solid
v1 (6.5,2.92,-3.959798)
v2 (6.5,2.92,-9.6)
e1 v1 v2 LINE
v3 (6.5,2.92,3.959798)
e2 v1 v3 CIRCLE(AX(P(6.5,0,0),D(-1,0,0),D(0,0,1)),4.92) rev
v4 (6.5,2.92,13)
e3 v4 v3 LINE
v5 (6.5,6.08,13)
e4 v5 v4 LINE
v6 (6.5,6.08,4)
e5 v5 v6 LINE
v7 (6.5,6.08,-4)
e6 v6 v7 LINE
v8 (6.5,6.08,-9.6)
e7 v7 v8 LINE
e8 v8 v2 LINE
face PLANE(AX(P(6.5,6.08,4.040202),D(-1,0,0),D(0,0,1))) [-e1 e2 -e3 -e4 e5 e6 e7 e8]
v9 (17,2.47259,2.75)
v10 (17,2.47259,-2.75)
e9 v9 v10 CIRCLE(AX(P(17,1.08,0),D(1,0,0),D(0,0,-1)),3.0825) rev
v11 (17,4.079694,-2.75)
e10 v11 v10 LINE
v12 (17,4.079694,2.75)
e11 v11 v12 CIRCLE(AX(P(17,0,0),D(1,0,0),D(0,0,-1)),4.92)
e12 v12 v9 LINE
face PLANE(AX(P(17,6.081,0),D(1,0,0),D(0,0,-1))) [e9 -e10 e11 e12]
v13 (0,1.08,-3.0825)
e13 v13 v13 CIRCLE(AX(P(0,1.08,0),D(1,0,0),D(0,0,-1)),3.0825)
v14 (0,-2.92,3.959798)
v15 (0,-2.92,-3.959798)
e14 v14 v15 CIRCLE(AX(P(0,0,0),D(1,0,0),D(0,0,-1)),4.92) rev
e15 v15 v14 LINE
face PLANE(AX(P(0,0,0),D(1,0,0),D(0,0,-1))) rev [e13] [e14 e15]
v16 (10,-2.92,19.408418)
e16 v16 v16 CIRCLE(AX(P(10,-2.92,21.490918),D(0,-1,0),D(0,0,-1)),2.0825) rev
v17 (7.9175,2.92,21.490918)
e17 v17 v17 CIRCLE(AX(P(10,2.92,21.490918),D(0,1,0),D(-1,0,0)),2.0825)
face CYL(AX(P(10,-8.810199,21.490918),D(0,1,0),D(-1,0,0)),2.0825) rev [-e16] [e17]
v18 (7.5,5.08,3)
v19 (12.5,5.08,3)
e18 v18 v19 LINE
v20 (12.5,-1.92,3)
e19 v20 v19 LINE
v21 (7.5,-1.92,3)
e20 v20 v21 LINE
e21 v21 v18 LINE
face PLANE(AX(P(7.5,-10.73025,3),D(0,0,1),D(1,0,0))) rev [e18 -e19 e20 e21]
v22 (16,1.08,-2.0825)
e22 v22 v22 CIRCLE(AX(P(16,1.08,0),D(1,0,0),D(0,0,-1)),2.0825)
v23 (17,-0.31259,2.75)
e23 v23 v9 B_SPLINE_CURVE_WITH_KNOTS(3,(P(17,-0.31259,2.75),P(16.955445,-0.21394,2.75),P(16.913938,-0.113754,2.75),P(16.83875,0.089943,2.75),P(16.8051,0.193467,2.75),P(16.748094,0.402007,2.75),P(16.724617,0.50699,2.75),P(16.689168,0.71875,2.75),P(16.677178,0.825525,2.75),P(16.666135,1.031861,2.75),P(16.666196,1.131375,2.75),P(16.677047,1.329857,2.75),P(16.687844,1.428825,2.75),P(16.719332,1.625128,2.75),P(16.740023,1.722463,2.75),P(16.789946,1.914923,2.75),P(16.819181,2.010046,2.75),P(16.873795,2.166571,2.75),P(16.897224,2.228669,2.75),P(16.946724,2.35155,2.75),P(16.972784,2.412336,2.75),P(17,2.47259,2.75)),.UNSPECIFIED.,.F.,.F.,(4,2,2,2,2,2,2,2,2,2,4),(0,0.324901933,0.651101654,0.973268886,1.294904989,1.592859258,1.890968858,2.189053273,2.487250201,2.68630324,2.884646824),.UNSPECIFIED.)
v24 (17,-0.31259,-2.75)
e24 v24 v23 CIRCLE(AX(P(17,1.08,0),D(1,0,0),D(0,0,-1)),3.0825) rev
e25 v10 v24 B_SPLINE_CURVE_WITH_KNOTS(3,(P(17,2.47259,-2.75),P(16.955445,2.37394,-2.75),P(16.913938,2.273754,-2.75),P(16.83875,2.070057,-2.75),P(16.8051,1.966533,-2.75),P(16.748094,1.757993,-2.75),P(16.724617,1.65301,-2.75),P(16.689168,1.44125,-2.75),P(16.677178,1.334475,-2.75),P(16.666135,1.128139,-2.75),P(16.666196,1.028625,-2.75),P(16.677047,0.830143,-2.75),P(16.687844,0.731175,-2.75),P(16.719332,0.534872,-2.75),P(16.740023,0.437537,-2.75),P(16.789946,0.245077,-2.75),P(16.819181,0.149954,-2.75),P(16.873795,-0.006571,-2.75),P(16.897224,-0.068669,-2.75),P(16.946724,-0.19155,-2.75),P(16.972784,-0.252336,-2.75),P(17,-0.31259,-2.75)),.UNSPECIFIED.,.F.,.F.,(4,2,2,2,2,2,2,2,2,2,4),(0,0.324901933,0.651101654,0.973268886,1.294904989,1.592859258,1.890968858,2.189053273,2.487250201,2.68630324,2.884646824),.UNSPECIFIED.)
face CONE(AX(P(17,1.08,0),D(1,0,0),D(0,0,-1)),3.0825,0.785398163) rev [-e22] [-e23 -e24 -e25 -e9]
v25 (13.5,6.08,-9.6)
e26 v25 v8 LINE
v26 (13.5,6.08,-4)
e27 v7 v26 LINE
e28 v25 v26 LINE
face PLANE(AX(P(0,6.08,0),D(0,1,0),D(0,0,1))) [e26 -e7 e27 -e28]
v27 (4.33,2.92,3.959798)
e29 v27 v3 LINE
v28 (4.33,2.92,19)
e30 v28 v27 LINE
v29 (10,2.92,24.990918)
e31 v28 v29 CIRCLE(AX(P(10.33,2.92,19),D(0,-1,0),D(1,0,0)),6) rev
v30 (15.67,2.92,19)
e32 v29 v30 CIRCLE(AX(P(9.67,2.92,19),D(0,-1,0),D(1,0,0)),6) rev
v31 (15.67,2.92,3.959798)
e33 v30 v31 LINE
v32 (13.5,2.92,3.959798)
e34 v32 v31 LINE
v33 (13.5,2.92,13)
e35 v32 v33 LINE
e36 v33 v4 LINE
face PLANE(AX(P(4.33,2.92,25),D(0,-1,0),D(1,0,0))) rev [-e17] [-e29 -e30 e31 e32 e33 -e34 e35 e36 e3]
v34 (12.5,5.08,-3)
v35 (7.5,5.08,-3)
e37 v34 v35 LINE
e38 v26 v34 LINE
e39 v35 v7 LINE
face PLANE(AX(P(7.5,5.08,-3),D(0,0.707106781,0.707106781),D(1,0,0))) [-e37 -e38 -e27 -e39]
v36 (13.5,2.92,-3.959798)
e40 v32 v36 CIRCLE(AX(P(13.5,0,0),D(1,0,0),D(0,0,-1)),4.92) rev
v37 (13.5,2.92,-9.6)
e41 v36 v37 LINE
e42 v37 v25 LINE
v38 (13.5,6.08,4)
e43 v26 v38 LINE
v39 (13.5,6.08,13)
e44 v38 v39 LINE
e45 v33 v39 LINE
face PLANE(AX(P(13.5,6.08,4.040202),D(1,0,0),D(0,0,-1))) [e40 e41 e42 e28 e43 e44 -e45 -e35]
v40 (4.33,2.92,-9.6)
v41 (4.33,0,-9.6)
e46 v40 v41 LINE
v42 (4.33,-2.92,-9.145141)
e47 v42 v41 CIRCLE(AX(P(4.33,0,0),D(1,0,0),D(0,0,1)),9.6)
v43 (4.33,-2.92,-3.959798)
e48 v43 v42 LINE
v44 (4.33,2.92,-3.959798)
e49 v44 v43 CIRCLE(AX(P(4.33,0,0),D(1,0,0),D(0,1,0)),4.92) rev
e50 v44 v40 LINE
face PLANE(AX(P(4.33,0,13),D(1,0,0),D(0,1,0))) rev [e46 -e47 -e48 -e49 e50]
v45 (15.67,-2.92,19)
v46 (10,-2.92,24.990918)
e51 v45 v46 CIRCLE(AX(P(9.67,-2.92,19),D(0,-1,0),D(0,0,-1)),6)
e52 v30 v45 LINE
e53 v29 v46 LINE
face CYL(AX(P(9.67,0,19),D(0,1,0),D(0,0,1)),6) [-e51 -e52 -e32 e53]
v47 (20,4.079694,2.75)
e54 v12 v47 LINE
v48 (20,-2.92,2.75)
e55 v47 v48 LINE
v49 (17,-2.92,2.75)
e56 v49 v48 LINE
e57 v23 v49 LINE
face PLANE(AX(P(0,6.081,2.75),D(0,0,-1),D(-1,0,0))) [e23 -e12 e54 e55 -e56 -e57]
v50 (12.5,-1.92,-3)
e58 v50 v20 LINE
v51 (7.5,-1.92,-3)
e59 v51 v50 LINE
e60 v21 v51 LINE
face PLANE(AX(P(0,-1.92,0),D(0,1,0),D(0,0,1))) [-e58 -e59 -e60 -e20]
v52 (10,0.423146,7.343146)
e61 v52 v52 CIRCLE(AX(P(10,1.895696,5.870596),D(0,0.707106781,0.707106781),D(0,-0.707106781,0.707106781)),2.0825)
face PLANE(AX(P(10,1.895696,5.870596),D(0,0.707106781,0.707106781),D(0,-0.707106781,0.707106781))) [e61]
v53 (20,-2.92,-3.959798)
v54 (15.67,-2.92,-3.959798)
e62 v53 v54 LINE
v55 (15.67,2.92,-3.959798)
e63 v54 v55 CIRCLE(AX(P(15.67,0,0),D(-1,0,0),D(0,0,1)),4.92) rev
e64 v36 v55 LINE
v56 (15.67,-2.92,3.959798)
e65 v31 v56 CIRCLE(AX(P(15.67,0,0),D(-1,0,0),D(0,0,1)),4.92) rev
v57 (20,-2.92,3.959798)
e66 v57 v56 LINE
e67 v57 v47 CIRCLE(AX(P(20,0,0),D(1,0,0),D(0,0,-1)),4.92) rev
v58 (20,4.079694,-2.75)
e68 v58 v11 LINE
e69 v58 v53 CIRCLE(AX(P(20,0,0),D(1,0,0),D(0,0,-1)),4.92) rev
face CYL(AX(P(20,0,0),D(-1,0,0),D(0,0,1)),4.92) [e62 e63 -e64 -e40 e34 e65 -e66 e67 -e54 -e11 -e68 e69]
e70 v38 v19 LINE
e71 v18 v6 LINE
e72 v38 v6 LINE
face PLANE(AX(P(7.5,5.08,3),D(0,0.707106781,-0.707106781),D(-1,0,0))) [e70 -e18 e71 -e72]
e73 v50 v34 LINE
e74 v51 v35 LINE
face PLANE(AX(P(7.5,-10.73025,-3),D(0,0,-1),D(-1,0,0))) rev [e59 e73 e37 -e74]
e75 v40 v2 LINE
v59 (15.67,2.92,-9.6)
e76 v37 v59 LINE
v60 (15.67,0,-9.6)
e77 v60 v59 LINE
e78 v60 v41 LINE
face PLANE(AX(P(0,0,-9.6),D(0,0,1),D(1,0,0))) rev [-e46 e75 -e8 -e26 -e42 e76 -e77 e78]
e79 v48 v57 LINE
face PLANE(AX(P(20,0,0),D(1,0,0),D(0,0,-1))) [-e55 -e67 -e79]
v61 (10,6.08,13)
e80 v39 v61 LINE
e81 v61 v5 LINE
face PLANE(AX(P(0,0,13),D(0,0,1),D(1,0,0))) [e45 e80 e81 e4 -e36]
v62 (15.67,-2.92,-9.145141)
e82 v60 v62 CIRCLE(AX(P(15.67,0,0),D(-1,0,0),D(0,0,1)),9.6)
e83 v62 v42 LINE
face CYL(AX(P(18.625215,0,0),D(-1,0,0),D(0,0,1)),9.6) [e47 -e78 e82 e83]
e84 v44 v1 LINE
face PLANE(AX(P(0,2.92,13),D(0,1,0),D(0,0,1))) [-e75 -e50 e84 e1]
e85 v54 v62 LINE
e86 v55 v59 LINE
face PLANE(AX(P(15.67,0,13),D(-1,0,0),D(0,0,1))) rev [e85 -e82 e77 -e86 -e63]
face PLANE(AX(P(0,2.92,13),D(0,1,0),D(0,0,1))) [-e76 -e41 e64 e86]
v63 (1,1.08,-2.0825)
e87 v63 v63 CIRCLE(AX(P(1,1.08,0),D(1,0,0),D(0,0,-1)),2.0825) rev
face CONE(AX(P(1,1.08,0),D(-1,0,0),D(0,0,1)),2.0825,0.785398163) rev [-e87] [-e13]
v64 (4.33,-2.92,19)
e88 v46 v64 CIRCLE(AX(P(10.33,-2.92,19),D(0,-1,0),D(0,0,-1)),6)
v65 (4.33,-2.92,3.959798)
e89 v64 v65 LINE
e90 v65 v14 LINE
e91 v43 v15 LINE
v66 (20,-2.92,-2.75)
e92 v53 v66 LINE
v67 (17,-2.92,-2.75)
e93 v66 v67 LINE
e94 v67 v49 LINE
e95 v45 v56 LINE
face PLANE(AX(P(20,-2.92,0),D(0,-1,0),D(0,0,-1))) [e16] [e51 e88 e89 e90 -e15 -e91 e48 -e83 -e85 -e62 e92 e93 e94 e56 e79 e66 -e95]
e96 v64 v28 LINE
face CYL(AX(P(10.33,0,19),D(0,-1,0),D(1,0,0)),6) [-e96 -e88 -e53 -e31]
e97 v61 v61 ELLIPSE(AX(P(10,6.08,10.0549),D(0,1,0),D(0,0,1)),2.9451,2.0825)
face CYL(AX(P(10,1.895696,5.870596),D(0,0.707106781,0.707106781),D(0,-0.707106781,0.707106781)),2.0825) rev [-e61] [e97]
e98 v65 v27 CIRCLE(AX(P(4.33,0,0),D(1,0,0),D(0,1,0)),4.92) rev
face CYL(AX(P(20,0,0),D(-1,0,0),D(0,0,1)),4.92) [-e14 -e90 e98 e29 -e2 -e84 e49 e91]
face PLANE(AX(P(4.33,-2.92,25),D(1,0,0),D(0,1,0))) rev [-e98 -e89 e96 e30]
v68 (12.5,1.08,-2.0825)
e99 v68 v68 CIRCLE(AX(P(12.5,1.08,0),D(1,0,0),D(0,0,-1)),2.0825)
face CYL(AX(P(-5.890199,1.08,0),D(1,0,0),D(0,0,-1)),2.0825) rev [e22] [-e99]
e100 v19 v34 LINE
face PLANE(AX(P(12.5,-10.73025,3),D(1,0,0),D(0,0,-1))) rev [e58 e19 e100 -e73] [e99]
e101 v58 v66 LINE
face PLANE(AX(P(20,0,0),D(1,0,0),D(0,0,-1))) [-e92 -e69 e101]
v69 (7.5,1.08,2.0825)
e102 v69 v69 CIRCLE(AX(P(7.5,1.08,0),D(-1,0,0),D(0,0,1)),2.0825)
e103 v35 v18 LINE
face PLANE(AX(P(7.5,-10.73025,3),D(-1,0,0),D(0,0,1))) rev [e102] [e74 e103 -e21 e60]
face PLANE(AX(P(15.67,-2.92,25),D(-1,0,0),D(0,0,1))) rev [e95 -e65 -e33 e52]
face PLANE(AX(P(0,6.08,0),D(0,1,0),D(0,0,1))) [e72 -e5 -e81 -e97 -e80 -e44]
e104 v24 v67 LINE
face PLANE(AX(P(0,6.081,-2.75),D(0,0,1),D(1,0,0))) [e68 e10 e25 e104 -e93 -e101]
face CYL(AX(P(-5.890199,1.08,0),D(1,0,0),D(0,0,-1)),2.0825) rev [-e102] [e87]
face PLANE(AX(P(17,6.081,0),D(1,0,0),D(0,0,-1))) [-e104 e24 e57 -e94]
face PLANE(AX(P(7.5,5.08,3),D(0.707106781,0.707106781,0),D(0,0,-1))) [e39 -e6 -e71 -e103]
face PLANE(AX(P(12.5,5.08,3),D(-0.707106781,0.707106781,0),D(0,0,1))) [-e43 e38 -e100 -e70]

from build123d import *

# Parameters (mm, degrees)
BOSS_EXTRUDE1_DEPTH      = 20
SKETCH3_W                = 11.34
SKETCH3_H                = 5.84
BOSS_EXTRUDE2_DEPTH      = 25
FILLET1_R                = 6
SKETCH4_W                = 7
SKETCH4_H                = 8
BOSS_EXTRUDE3_DEPTH      = 9
BOSS_EXTRUDE4_DEPTH      = 13
BOSS_EXTRUDE4_DEPTH_BACK = 9.6
SKETCH10_W               = 7
SKETCH10_H               = 3.16
SKETCH5_W                = 5
SKETCH5_H                = 6
CUT_EXTRUDE1_DEPTH       = 9
SKETCH6_R                = 2.0825
CUT_EXTRUDE2_DEPTH       = 5.84
CUT_EXTRUDE3_REACH       = 34.581
SKETCH8_R                = 2.0825
CUT_EXTRUDE4_REACH       = 35.25
CUT_EXTRUDE4_END_RADIUS  = 4.92
CUT_EXTRUDE5_DEPTH       = 11.34
SKETCH13_R               = 2.0825
CUT_EXTRUDE7_DEPTH       = 8
SKETCH14_W               = 5
SKETCH14_H               = 6
BOSS_EXTRUDE5_DEPTH      = 1


with BuildPart() as part:
    # Sketch2 → Boss-Extrude1 (new body)
    with BuildSketch(Plane(origin=(0, 0, 0), x_dir=(0, 0, -1), z_dir=(1, 0, 0))):
        with BuildLine():
            Line((3.959797975, -2.92), (-3.959797975, -2.92))
            ThreePointArc((-3.959797975, -2.92), (-4.92, 0), (-3.959797975, 2.92))
            ThreePointArc((-3.959797975, 2.92), (0, 4.92), (3.959797975, 2.92))
            ThreePointArc((3.959797975, 2.92), (4.92, 0), (3.959797975, -2.92))
        make_face()
    extrude(amount=BOSS_EXTRUDE1_DEPTH)

    # Sketch3 → Boss-Extrude2 (add)
    with BuildSketch(Plane.XY):
        with Locations((10, 0)):
            Rectangle(SKETCH3_W, SKETCH3_H)
    extrude(amount=BOSS_EXTRUDE2_DEPTH)

    # Fillet1
    # the kernel refuses this fillet: 6 mm, written as the material it takes off along each edge
    with BuildSketch(Plane(origin=(15.67, -17.92, 25), x_dir=(0, 0, -1), z_dir=(0, 1, 0)), Plane(origin=(4.33, 17.92, 25), x_dir=(0, 0, -1), z_dir=(0, -1, 0))) as fillet1_piece_1:
        with BuildLine():
            CenterArc((FILLET1_R, FILLET1_R), FILLET1_R, 180, 90)
            Line((0, FILLET1_R), (0, 0))
            Line((0, 0), (FILLET1_R, 0))
        make_face()
    extrude(amount=35.84, mode=Mode.SUBTRACT)

    # Sketch4 → Boss-Extrude3 (add)
    with BuildSketch(Plane.XZ.offset(2.92)):
        with Locations((10, 0.040202025)):
            Rectangle(SKETCH4_W, SKETCH4_H)
    extrude(amount=-BOSS_EXTRUDE3_DEPTH)

    # Sketch10 → Boss-Extrude4 (add, two sides: drawn at the far end of the back side and taken through both)
    with BuildSketch(Plane.XY.offset(-BOSS_EXTRUDE4_DEPTH_BACK)):
        with Locations((10, 4.5)):
            Rectangle(SKETCH10_W, SKETCH10_H)
        Polygon((6.5, 2.92), (13.5, 2.92), (15.67, 2.92), (15.67, -2.92), (10, -2.92), (4.33, -2.92), (4.33, 2.92), align=None)
    extrude(amount=BOSS_EXTRUDE4_DEPTH + BOSS_EXTRUDE4_DEPTH_BACK)

    # Sketch5 → Cut-Extrude1 (cut)
    with BuildSketch(Plane(origin=(0, 6.08, 0), x_dir=(1, 0, 0), z_dir=(0, 1, 0))):
        with Locations((10, 0)):
            Rectangle(SKETCH5_W, SKETCH5_H)
    extrude(amount=-CUT_EXTRUDE1_DEPTH, mode=Mode.SUBTRACT)

    # Sketch6 → Cut-Extrude2 (cut)
    with BuildSketch(Plane(origin=(0, 2.92, 0), x_dir=(1, 0, 0), z_dir=(0, 1, 0))):
        with Locations(Location((10, -21.490918127, 0), (0, 0, 180))):
            Circle(SKETCH6_R)
    extrude(amount=-CUT_EXTRUDE2_DEPTH, mode=Mode.SUBTRACT)

    # Cut-Extrude3: up to this face of the body (flat: up to its plane)
    cut_extrude3_end = Plane(part.part.faces().sort_by_distance((0, 0.637144392, 0))[0])
    # Sketch8 → Cut-Extrude3 (cut, up to the picked face)
    with BuildSketch(Plane(origin=(20, 0, 0), x_dir=(0, 0, -1), z_dir=(1, 0, 0)), mode=Mode.PRIVATE) as cut_extrude3_sk1:
        with Locations((0, 1.08)):
            Circle(SKETCH8_R)
    cut_extrude3_tool1 = split(extrude(cut_extrude3_sk1.sketch, amount=-CUT_EXTRUDE3_REACH, mode=Mode.PRIVATE), bisect_by=cut_extrude3_end, keep=Keep.BOTH, mode=Mode.PRIVATE)
    add(cut_extrude3_tool1.solids().sort_by(Axis((20, 1.08, 0), (-1, 0, 0)))[0], mode=Mode.SUBTRACT)

    # Cut-Extrude4: up to this cylinder (the profile starts inside it)
    cut_extrude4_end = Plane(origin=(18.5, 0, 0), z_dir=(-1, 0, 0)) * Cylinder(CUT_EXTRUDE4_END_RADIUS, 81.34, mode=Mode.PRIVATE)
    # Sketch9 → Cut-Extrude4 (cut, up to the surface)
    with BuildSketch(Plane(origin=(0, -2.92, 0), x_dir=(1, 0, 0), z_dir=(0, 1, 0)), mode=Mode.PRIVATE) as cut_extrude4_sk1:
        Polygon((17, -2.75), (20, -2.75), (20, -2.0825), (20, 2.0825), (20, 2.75), (17, 2.75), align=None)
    cut_extrude4_tool1 = extrude(cut_extrude4_sk1.sketch, amount=CUT_EXTRUDE4_REACH, mode=Mode.PRIVATE) & cut_extrude4_end
    add(cut_extrude4_tool1.solids().sort_by_distance((18.5, -2.92, 0))[0], mode=Mode.SUBTRACT)

    # Chamfer1
    # the kernel refuses this chamfer: 1 mm, written as the material it takes off along each edge
    with BuildSketch(Plane(origin=(12.5, 6.08, 3), x_dir=(-0.027495876610585623, -0.9996219169112968, 0), z_dir=(0, 0, -1)), Plane(origin=(7.5, 6.08, -3), x_dir=(0.027495876610586487, -0.9996219169112968, 0), z_dir=(0, 0, 1))) as chamfer1_piece_1:
        with BuildLine():
            Line((1.028673195, 0), (-0.056547155, -1.027117794))
            Line((-0.056547155, -1.027117794), (-0.076539593, -1.026567876))
            ThreePointArc((-0.076539593, -1.026567876), (-0.034129227, -0.51339783), (-0.019992438, 0.000549918))
            Line((-0.019992438, 0.000549918), (0.000549918, 0.019992438))
            ThreePointArc((0.000549918, 0.019992438), (0.514497665, 0.00585565), (1.029223113, 0.019992438))
            Line((1.029223113, 0.019992438), (1.028673195, 0))
        make_face()
    extrude(amount=6, mode=Mode.SUBTRACT)
    with BuildSketch(Plane(origin=(12.5, 6.08, -3), x_dir=(0, -0.9996219169112968, 0.027495876610586487), z_dir=(-1, 0, 0)), Plane(origin=(7.5, 6.08, 3), x_dir=(0, -0.9996219169112968, -0.027495876610586487), z_dir=(1, 0, 0))) as chamfer1_piece_2:
        with BuildLine():
            Line((1.028673195, 0), (-0.056547155, -1.027117794))
            Line((-0.056547155, -1.027117794), (-0.076539593, -1.026567876))
            ThreePointArc((-0.076539593, -1.026567876), (-0.034129227, -0.51339783), (-0.019992438, 0.000549918))
            Line((-0.019992438, 0.000549918), (0.000549918, 0.019992438))
            ThreePointArc((0.000549918, 0.019992438), (0.514497665, 0.00585565), (1.029223113, 0.019992438))
            Line((1.029223113, 0.019992438), (1.028673195, 0))
        make_face()
    extrude(amount=5, mode=Mode.SUBTRACT)
    with BuildSketch(Plane(origin=(0, 1.08, 0), x_dir=(0, 0, -1), z_dir=(0, -1, 0))) as chamfer1_piece_3:
        with BuildLine():
            Line((3.110784271, -0.028284271), (2.054215729, 1.028284271))
            Line((2.054215729, 1.028284271), (2.034215729, 1.028284271))
            ThreePointArc((2.034215729, 1.028284271), (2.0625, 0.514142136), (2.0625, 0))
            Line((2.0625, 0), (2.0825, -0.02))
            ThreePointArc((2.0825, -0.02), (2.596642136, -0.02), (3.110784271, -0.048284271))
            Line((3.110784271, -0.048284271), (3.110784271, -0.028284271))
        make_face()
    revolve(axis=Axis((0, 1.08, 0), (1, 0, 0)), mode=Mode.SUBTRACT)
    with BuildSketch(Plane(origin=(17, 1.08, 0), x_dir=(0, 0, -1), z_dir=(0, -1, 0))) as chamfer1_piece_4_section:
        with BuildLine():
            Line((3.110784271, 0.028284271), (2.054215729, -1.028284271))
            Line((2.054215729, -1.028284271), (2.034215729, -1.028284271))
            ThreePointArc((2.034215729, -1.028284271), (2.0625, -0.514142136), (2.0625, 0))
            Line((2.0625, 0), (2.0825, 0.02))
            ThreePointArc((2.0825, 0.02), (2.596642136, 0.02), (3.110784271, 0.048284271))
            Line((3.110784271, 0.048284271), (3.110784271, 0.028284271))
        make_face()
    chamfer1_piece_4 = revolve(axis=Axis((17, 1.08, 0), (1, 0, 0)), mode=Mode.PRIVATE)
    chamfer1_piece_4 = split(chamfer1_piece_4, bisect_by=Plane(origin=(16.514214791, 1.08, -2.75), z_dir=(0, 0, 1)), keep=Keep.TOP, mode=Mode.PRIVATE)
    chamfer1_piece_4 = split(chamfer1_piece_4, bisect_by=Plane(origin=(16.514214791, 1.08, 2.75), z_dir=(0, 0, -1)), keep=Keep.TOP, mode=Mode.PRIVATE)
    add(chamfer1_piece_4, mode=Mode.SUBTRACT)
    with BuildSketch(Plane(origin=(7.5, 6.08, 3), x_dir=(0, -0.9996219169112968, -0.027495876610586487), z_dir=(1, 0, 0))) as chamfer1_piece_5a_section:
        with BuildLine():
            Line((1.028673195, 0), (-0.056547155, -1.027117794))
            Line((-0.056547155, -1.027117794), (-0.076539593, -1.026567876))
            ThreePointArc((-0.076539593, -1.026567876), (-0.034129227, -0.51339783), (-0.019992438, 0.000549918))
            Line((-0.019992438, 0.000549918), (0.000549918, 0.019992438))
            ThreePointArc((0.000549918, 0.019992438), (0.514497665, 0.00585565), (1.029223113, 0.019992438))
            Line((1.029223113, 0.019992438), (1.028673195, 0))
        make_face()
    chamfer1_piece_5a = extrude(amount=7.571682988, mode=Mode.PRIVATE)
    chamfer1_piece_5a = split(chamfer1_piece_5a, bisect_by=Plane(origin=(12.5, 5.750206373, 3.329793627), z_dir=(1, 0, 0)), keep=Keep.TOP, mode=Mode.PRIVATE)
    with BuildSketch(Plane(origin=(12.5, 6.08, 5.571682988), x_dir=(-0.027495876610585623, -0.9996219169112968, 0), z_dir=(0, 0, -1))) as chamfer1_piece_5b_section:
        with BuildLine():
            Line((1.028673195, 0), (-0.056547155, -1.027117794))
            Line((-0.056547155, -1.027117794), (-0.076539593, -1.026567876))
            ThreePointArc((-0.076539593, -1.026567876), (-0.034129227, -0.51339783), (-0.019992438, 0.000549918))
            Line((-0.019992438, 0.000549918), (0.000549918, 0.019992438))
            ThreePointArc((0.000549918, 0.019992438), (0.514497665, 0.00585565), (1.029223113, 0.019992438))
            Line((1.029223113, 0.019992438), (1.028673195, 0))
        make_face()
    chamfer1_piece_5b = extrude(amount=8.571682988, mode=Mode.PRIVATE)
    chamfer1_piece_5b = split(chamfer1_piece_5b, bisect_by=Plane(origin=(12.829793627, 5.750206373, 3), z_dir=(0, 0, 1)), keep=Keep.TOP, mode=Mode.PRIVATE)
    chamfer1_piece_5 = chamfer1_piece_5a & chamfer1_piece_5b
    add(chamfer1_piece_5, mode=Mode.SUBTRACT)
    with BuildSketch(Plane(origin=(15.071682988, 6.08, -3), x_dir=(0, -0.9996219169112968, 0.027495876610586487), z_dir=(-1, 0, 0))) as chamfer1_piece_6a_section:
        with BuildLine():
            Line((1.028673195, 0), (-0.056547155, -1.027117794))
            Line((-0.056547155, -1.027117794), (-0.076539593, -1.026567876))
            ThreePointArc((-0.076539593, -1.026567876), (-0.034129227, -0.51339783), (-0.019992438, 0.000549918))
            Line((-0.019992438, 0.000549918), (0.000549918, 0.019992438))
            ThreePointArc((0.000549918, 0.019992438), (0.514497665, 0.00585565), (1.029223113, 0.019992438))
            Line((1.029223113, 0.019992438), (1.028673195, 0))
        make_face()
    chamfer1_piece_6a = extrude(amount=7.571682988, mode=Mode.PRIVATE)
    chamfer1_piece_6a = split(chamfer1_piece_6a, bisect_by=Plane(origin=(12.5, 5.750206373, -3.329793627), z_dir=(1, 0, 0)), keep=Keep.TOP, mode=Mode.PRIVATE)
    with BuildSketch(Plane(origin=(12.5, 6.08, 3), x_dir=(-0.027495876610585623, -0.9996219169112968, 0), z_dir=(0, 0, -1))) as chamfer1_piece_6b_section:
        with BuildLine():
            Line((1.028673195, 0), (-0.056547155, -1.027117794))
            Line((-0.056547155, -1.027117794), (-0.076539593, -1.026567876))
            ThreePointArc((-0.076539593, -1.026567876), (-0.034129227, -0.51339783), (-0.019992438, 0.000549918))
            Line((-0.019992438, 0.000549918), (0.000549918, 0.019992438))
            ThreePointArc((0.000549918, 0.019992438), (0.514497665, 0.00585565), (1.029223113, 0.019992438))
            Line((1.029223113, 0.019992438), (1.028673195, 0))
        make_face()
    chamfer1_piece_6b = extrude(amount=8.571682988, mode=Mode.PRIVATE)
    chamfer1_piece_6b = split(chamfer1_piece_6b, bisect_by=Plane(origin=(12.829793627, 5.750206373, -3), z_dir=(0, 0, -1)), keep=Keep.TOP, mode=Mode.PRIVATE)
    chamfer1_piece_6 = chamfer1_piece_6a & chamfer1_piece_6b
    add(chamfer1_piece_6, mode=Mode.SUBTRACT)
    with BuildSketch(Plane(origin=(7.5, 6.08, -5.571682988), x_dir=(0.027495876610586487, -0.9996219169112968, 0), z_dir=(0, 0, 1))) as chamfer1_piece_7a_section:
        with BuildLine():
            Line((1.028673195, 0), (-0.056547155, -1.027117794))
            Line((-0.056547155, -1.027117794), (-0.076539593, -1.026567876))
            ThreePointArc((-0.076539593, -1.026567876), (-0.034129227, -0.51339783), (-0.019992438, 0.000549918))
            Line((-0.019992438, 0.000549918), (0.000549918, 0.019992438))
            ThreePointArc((0.000549918, 0.019992438), (0.514497665, 0.00585565), (1.029223113, 0.019992438))
            Line((1.029223113, 0.019992438), (1.028673195, 0))
        make_face()
    chamfer1_piece_7a = extrude(amount=8.571682988, mode=Mode.PRIVATE)
    chamfer1_piece_7a = split(chamfer1_piece_7a, bisect_by=Plane(origin=(7.170206373, 5.750206373, -3), z_dir=(0, 0, -1)), keep=Keep.TOP, mode=Mode.PRIVATE)
    with BuildSketch(Plane(origin=(12.5, 6.08, -3), x_dir=(0, -0.9996219169112968, 0.027495876610586487), z_dir=(-1, 0, 0))) as chamfer1_piece_7b_section:
        with BuildLine():
            Line((1.028673195, 0), (-0.056547155, -1.027117794))
            Line((-0.056547155, -1.027117794), (-0.076539593, -1.026567876))
            ThreePointArc((-0.076539593, -1.026567876), (-0.034129227, -0.51339783), (-0.019992438, 0.000549918))
            Line((-0.019992438, 0.000549918), (0.000549918, 0.019992438))
            ThreePointArc((0.000549918, 0.019992438), (0.514497665, 0.00585565), (1.029223113, 0.019992438))
            Line((1.029223113, 0.019992438), (1.028673195, 0))
        make_face()
    chamfer1_piece_7b = extrude(amount=7.571682988, mode=Mode.PRIVATE)
    chamfer1_piece_7b = split(chamfer1_piece_7b, bisect_by=Plane(origin=(7.5, 5.750206373, -3.329793627), z_dir=(-1, 0, 0)), keep=Keep.TOP, mode=Mode.PRIVATE)
    chamfer1_piece_7 = chamfer1_piece_7a & chamfer1_piece_7b
    add(chamfer1_piece_7, mode=Mode.SUBTRACT)
    with BuildSketch(Plane(origin=(7.5, 6.08, -3), x_dir=(0.027495876610586487, -0.9996219169112968, 0), z_dir=(0, 0, 1))) as chamfer1_piece_8a_section:
        with BuildLine():
            Line((1.028673195, 0), (-0.056547155, -1.027117794))
            Line((-0.056547155, -1.027117794), (-0.076539593, -1.026567876))
            ThreePointArc((-0.076539593, -1.026567876), (-0.034129227, -0.51339783), (-0.019992438, 0.000549918))
            Line((-0.019992438, 0.000549918), (0.000549918, 0.019992438))
            ThreePointArc((0.000549918, 0.019992438), (0.514497665, 0.00585565), (1.029223113, 0.019992438))
            Line((1.029223113, 0.019992438), (1.028673195, 0))
        make_face()
    chamfer1_piece_8a = extrude(amount=8.571682988, mode=Mode.PRIVATE)
    chamfer1_piece_8a = split(chamfer1_piece_8a, bisect_by=Plane(origin=(7.170206373, 5.750206373, 3), z_dir=(0, 0, 1)), keep=Keep.TOP, mode=Mode.PRIVATE)
    with BuildSketch(Plane(origin=(4.928317012, 6.08, 3), x_dir=(0, -0.9996219169112968, -0.027495876610586487), z_dir=(1, 0, 0))) as chamfer1_piece_8b_section:
        with BuildLine():
            Line((1.028673195, 0), (-0.056547155, -1.027117794))
            Line((-0.056547155, -1.027117794), (-0.076539593, -1.026567876))
            ThreePointArc((-0.076539593, -1.026567876), (-0.034129227, -0.51339783), (-0.019992438, 0.000549918))
            Line((-0.019992438, 0.000549918), (0.000549918, 0.019992438))
            ThreePointArc((0.000549918, 0.019992438), (0.514497665, 0.00585565), (1.029223113, 0.019992438))
            Line((1.029223113, 0.019992438), (1.028673195, 0))
        make_face()
    chamfer1_piece_8b = extrude(amount=7.571682988, mode=Mode.PRIVATE)
    chamfer1_piece_8b = split(chamfer1_piece_8b, bisect_by=Plane(origin=(7.5, 5.750206373, 3.329793627), z_dir=(-1, 0, 0)), keep=Keep.TOP, mode=Mode.PRIVATE)
    chamfer1_piece_8 = chamfer1_piece_8a & chamfer1_piece_8b
    add(chamfer1_piece_8, mode=Mode.SUBTRACT)

    # Sketch11 → Cut-Extrude5 (cut)
    with BuildSketch(Plane.ZY.offset(-4.33)):
        with BuildLine():
            Line((-9.145140786, -2.92), (-9.6, -2.92))
            Line((-9.6, -2.92), (-9.6, 0))
            ThreePointArc((-9.6, 0), (-9.485603606, -1.477607602), (-9.145140786, -2.92))
        make_face()
    extrude(amount=-CUT_EXTRUDE5_DEPTH, mode=Mode.SUBTRACT)

    # Sketch13 → Cut-Extrude7 (cut)
    with BuildSketch(Plane(origin=(0, 9.54, 9.54), x_dir=(-1, 0, 0), z_dir=(0, 0.7071067811865464, 0.7071067811865488))):
        with Locations(Location((-10, 2.810678926, 0), (0, 0, 90))):
            Circle(SKETCH13_R)
    extrude(amount=-CUT_EXTRUDE7_DEPTH, mode=Mode.SUBTRACT)

    # Sketch14 → Boss-Extrude5 (add)
    with BuildSketch(Plane.XZ.offset(2.92)):
        with Locations((10, 0)):
            Rectangle(SKETCH14_W, SKETCH14_H)
    extrude(amount=-BOSS_EXTRUDE5_DEPTH)


solid = part.part
